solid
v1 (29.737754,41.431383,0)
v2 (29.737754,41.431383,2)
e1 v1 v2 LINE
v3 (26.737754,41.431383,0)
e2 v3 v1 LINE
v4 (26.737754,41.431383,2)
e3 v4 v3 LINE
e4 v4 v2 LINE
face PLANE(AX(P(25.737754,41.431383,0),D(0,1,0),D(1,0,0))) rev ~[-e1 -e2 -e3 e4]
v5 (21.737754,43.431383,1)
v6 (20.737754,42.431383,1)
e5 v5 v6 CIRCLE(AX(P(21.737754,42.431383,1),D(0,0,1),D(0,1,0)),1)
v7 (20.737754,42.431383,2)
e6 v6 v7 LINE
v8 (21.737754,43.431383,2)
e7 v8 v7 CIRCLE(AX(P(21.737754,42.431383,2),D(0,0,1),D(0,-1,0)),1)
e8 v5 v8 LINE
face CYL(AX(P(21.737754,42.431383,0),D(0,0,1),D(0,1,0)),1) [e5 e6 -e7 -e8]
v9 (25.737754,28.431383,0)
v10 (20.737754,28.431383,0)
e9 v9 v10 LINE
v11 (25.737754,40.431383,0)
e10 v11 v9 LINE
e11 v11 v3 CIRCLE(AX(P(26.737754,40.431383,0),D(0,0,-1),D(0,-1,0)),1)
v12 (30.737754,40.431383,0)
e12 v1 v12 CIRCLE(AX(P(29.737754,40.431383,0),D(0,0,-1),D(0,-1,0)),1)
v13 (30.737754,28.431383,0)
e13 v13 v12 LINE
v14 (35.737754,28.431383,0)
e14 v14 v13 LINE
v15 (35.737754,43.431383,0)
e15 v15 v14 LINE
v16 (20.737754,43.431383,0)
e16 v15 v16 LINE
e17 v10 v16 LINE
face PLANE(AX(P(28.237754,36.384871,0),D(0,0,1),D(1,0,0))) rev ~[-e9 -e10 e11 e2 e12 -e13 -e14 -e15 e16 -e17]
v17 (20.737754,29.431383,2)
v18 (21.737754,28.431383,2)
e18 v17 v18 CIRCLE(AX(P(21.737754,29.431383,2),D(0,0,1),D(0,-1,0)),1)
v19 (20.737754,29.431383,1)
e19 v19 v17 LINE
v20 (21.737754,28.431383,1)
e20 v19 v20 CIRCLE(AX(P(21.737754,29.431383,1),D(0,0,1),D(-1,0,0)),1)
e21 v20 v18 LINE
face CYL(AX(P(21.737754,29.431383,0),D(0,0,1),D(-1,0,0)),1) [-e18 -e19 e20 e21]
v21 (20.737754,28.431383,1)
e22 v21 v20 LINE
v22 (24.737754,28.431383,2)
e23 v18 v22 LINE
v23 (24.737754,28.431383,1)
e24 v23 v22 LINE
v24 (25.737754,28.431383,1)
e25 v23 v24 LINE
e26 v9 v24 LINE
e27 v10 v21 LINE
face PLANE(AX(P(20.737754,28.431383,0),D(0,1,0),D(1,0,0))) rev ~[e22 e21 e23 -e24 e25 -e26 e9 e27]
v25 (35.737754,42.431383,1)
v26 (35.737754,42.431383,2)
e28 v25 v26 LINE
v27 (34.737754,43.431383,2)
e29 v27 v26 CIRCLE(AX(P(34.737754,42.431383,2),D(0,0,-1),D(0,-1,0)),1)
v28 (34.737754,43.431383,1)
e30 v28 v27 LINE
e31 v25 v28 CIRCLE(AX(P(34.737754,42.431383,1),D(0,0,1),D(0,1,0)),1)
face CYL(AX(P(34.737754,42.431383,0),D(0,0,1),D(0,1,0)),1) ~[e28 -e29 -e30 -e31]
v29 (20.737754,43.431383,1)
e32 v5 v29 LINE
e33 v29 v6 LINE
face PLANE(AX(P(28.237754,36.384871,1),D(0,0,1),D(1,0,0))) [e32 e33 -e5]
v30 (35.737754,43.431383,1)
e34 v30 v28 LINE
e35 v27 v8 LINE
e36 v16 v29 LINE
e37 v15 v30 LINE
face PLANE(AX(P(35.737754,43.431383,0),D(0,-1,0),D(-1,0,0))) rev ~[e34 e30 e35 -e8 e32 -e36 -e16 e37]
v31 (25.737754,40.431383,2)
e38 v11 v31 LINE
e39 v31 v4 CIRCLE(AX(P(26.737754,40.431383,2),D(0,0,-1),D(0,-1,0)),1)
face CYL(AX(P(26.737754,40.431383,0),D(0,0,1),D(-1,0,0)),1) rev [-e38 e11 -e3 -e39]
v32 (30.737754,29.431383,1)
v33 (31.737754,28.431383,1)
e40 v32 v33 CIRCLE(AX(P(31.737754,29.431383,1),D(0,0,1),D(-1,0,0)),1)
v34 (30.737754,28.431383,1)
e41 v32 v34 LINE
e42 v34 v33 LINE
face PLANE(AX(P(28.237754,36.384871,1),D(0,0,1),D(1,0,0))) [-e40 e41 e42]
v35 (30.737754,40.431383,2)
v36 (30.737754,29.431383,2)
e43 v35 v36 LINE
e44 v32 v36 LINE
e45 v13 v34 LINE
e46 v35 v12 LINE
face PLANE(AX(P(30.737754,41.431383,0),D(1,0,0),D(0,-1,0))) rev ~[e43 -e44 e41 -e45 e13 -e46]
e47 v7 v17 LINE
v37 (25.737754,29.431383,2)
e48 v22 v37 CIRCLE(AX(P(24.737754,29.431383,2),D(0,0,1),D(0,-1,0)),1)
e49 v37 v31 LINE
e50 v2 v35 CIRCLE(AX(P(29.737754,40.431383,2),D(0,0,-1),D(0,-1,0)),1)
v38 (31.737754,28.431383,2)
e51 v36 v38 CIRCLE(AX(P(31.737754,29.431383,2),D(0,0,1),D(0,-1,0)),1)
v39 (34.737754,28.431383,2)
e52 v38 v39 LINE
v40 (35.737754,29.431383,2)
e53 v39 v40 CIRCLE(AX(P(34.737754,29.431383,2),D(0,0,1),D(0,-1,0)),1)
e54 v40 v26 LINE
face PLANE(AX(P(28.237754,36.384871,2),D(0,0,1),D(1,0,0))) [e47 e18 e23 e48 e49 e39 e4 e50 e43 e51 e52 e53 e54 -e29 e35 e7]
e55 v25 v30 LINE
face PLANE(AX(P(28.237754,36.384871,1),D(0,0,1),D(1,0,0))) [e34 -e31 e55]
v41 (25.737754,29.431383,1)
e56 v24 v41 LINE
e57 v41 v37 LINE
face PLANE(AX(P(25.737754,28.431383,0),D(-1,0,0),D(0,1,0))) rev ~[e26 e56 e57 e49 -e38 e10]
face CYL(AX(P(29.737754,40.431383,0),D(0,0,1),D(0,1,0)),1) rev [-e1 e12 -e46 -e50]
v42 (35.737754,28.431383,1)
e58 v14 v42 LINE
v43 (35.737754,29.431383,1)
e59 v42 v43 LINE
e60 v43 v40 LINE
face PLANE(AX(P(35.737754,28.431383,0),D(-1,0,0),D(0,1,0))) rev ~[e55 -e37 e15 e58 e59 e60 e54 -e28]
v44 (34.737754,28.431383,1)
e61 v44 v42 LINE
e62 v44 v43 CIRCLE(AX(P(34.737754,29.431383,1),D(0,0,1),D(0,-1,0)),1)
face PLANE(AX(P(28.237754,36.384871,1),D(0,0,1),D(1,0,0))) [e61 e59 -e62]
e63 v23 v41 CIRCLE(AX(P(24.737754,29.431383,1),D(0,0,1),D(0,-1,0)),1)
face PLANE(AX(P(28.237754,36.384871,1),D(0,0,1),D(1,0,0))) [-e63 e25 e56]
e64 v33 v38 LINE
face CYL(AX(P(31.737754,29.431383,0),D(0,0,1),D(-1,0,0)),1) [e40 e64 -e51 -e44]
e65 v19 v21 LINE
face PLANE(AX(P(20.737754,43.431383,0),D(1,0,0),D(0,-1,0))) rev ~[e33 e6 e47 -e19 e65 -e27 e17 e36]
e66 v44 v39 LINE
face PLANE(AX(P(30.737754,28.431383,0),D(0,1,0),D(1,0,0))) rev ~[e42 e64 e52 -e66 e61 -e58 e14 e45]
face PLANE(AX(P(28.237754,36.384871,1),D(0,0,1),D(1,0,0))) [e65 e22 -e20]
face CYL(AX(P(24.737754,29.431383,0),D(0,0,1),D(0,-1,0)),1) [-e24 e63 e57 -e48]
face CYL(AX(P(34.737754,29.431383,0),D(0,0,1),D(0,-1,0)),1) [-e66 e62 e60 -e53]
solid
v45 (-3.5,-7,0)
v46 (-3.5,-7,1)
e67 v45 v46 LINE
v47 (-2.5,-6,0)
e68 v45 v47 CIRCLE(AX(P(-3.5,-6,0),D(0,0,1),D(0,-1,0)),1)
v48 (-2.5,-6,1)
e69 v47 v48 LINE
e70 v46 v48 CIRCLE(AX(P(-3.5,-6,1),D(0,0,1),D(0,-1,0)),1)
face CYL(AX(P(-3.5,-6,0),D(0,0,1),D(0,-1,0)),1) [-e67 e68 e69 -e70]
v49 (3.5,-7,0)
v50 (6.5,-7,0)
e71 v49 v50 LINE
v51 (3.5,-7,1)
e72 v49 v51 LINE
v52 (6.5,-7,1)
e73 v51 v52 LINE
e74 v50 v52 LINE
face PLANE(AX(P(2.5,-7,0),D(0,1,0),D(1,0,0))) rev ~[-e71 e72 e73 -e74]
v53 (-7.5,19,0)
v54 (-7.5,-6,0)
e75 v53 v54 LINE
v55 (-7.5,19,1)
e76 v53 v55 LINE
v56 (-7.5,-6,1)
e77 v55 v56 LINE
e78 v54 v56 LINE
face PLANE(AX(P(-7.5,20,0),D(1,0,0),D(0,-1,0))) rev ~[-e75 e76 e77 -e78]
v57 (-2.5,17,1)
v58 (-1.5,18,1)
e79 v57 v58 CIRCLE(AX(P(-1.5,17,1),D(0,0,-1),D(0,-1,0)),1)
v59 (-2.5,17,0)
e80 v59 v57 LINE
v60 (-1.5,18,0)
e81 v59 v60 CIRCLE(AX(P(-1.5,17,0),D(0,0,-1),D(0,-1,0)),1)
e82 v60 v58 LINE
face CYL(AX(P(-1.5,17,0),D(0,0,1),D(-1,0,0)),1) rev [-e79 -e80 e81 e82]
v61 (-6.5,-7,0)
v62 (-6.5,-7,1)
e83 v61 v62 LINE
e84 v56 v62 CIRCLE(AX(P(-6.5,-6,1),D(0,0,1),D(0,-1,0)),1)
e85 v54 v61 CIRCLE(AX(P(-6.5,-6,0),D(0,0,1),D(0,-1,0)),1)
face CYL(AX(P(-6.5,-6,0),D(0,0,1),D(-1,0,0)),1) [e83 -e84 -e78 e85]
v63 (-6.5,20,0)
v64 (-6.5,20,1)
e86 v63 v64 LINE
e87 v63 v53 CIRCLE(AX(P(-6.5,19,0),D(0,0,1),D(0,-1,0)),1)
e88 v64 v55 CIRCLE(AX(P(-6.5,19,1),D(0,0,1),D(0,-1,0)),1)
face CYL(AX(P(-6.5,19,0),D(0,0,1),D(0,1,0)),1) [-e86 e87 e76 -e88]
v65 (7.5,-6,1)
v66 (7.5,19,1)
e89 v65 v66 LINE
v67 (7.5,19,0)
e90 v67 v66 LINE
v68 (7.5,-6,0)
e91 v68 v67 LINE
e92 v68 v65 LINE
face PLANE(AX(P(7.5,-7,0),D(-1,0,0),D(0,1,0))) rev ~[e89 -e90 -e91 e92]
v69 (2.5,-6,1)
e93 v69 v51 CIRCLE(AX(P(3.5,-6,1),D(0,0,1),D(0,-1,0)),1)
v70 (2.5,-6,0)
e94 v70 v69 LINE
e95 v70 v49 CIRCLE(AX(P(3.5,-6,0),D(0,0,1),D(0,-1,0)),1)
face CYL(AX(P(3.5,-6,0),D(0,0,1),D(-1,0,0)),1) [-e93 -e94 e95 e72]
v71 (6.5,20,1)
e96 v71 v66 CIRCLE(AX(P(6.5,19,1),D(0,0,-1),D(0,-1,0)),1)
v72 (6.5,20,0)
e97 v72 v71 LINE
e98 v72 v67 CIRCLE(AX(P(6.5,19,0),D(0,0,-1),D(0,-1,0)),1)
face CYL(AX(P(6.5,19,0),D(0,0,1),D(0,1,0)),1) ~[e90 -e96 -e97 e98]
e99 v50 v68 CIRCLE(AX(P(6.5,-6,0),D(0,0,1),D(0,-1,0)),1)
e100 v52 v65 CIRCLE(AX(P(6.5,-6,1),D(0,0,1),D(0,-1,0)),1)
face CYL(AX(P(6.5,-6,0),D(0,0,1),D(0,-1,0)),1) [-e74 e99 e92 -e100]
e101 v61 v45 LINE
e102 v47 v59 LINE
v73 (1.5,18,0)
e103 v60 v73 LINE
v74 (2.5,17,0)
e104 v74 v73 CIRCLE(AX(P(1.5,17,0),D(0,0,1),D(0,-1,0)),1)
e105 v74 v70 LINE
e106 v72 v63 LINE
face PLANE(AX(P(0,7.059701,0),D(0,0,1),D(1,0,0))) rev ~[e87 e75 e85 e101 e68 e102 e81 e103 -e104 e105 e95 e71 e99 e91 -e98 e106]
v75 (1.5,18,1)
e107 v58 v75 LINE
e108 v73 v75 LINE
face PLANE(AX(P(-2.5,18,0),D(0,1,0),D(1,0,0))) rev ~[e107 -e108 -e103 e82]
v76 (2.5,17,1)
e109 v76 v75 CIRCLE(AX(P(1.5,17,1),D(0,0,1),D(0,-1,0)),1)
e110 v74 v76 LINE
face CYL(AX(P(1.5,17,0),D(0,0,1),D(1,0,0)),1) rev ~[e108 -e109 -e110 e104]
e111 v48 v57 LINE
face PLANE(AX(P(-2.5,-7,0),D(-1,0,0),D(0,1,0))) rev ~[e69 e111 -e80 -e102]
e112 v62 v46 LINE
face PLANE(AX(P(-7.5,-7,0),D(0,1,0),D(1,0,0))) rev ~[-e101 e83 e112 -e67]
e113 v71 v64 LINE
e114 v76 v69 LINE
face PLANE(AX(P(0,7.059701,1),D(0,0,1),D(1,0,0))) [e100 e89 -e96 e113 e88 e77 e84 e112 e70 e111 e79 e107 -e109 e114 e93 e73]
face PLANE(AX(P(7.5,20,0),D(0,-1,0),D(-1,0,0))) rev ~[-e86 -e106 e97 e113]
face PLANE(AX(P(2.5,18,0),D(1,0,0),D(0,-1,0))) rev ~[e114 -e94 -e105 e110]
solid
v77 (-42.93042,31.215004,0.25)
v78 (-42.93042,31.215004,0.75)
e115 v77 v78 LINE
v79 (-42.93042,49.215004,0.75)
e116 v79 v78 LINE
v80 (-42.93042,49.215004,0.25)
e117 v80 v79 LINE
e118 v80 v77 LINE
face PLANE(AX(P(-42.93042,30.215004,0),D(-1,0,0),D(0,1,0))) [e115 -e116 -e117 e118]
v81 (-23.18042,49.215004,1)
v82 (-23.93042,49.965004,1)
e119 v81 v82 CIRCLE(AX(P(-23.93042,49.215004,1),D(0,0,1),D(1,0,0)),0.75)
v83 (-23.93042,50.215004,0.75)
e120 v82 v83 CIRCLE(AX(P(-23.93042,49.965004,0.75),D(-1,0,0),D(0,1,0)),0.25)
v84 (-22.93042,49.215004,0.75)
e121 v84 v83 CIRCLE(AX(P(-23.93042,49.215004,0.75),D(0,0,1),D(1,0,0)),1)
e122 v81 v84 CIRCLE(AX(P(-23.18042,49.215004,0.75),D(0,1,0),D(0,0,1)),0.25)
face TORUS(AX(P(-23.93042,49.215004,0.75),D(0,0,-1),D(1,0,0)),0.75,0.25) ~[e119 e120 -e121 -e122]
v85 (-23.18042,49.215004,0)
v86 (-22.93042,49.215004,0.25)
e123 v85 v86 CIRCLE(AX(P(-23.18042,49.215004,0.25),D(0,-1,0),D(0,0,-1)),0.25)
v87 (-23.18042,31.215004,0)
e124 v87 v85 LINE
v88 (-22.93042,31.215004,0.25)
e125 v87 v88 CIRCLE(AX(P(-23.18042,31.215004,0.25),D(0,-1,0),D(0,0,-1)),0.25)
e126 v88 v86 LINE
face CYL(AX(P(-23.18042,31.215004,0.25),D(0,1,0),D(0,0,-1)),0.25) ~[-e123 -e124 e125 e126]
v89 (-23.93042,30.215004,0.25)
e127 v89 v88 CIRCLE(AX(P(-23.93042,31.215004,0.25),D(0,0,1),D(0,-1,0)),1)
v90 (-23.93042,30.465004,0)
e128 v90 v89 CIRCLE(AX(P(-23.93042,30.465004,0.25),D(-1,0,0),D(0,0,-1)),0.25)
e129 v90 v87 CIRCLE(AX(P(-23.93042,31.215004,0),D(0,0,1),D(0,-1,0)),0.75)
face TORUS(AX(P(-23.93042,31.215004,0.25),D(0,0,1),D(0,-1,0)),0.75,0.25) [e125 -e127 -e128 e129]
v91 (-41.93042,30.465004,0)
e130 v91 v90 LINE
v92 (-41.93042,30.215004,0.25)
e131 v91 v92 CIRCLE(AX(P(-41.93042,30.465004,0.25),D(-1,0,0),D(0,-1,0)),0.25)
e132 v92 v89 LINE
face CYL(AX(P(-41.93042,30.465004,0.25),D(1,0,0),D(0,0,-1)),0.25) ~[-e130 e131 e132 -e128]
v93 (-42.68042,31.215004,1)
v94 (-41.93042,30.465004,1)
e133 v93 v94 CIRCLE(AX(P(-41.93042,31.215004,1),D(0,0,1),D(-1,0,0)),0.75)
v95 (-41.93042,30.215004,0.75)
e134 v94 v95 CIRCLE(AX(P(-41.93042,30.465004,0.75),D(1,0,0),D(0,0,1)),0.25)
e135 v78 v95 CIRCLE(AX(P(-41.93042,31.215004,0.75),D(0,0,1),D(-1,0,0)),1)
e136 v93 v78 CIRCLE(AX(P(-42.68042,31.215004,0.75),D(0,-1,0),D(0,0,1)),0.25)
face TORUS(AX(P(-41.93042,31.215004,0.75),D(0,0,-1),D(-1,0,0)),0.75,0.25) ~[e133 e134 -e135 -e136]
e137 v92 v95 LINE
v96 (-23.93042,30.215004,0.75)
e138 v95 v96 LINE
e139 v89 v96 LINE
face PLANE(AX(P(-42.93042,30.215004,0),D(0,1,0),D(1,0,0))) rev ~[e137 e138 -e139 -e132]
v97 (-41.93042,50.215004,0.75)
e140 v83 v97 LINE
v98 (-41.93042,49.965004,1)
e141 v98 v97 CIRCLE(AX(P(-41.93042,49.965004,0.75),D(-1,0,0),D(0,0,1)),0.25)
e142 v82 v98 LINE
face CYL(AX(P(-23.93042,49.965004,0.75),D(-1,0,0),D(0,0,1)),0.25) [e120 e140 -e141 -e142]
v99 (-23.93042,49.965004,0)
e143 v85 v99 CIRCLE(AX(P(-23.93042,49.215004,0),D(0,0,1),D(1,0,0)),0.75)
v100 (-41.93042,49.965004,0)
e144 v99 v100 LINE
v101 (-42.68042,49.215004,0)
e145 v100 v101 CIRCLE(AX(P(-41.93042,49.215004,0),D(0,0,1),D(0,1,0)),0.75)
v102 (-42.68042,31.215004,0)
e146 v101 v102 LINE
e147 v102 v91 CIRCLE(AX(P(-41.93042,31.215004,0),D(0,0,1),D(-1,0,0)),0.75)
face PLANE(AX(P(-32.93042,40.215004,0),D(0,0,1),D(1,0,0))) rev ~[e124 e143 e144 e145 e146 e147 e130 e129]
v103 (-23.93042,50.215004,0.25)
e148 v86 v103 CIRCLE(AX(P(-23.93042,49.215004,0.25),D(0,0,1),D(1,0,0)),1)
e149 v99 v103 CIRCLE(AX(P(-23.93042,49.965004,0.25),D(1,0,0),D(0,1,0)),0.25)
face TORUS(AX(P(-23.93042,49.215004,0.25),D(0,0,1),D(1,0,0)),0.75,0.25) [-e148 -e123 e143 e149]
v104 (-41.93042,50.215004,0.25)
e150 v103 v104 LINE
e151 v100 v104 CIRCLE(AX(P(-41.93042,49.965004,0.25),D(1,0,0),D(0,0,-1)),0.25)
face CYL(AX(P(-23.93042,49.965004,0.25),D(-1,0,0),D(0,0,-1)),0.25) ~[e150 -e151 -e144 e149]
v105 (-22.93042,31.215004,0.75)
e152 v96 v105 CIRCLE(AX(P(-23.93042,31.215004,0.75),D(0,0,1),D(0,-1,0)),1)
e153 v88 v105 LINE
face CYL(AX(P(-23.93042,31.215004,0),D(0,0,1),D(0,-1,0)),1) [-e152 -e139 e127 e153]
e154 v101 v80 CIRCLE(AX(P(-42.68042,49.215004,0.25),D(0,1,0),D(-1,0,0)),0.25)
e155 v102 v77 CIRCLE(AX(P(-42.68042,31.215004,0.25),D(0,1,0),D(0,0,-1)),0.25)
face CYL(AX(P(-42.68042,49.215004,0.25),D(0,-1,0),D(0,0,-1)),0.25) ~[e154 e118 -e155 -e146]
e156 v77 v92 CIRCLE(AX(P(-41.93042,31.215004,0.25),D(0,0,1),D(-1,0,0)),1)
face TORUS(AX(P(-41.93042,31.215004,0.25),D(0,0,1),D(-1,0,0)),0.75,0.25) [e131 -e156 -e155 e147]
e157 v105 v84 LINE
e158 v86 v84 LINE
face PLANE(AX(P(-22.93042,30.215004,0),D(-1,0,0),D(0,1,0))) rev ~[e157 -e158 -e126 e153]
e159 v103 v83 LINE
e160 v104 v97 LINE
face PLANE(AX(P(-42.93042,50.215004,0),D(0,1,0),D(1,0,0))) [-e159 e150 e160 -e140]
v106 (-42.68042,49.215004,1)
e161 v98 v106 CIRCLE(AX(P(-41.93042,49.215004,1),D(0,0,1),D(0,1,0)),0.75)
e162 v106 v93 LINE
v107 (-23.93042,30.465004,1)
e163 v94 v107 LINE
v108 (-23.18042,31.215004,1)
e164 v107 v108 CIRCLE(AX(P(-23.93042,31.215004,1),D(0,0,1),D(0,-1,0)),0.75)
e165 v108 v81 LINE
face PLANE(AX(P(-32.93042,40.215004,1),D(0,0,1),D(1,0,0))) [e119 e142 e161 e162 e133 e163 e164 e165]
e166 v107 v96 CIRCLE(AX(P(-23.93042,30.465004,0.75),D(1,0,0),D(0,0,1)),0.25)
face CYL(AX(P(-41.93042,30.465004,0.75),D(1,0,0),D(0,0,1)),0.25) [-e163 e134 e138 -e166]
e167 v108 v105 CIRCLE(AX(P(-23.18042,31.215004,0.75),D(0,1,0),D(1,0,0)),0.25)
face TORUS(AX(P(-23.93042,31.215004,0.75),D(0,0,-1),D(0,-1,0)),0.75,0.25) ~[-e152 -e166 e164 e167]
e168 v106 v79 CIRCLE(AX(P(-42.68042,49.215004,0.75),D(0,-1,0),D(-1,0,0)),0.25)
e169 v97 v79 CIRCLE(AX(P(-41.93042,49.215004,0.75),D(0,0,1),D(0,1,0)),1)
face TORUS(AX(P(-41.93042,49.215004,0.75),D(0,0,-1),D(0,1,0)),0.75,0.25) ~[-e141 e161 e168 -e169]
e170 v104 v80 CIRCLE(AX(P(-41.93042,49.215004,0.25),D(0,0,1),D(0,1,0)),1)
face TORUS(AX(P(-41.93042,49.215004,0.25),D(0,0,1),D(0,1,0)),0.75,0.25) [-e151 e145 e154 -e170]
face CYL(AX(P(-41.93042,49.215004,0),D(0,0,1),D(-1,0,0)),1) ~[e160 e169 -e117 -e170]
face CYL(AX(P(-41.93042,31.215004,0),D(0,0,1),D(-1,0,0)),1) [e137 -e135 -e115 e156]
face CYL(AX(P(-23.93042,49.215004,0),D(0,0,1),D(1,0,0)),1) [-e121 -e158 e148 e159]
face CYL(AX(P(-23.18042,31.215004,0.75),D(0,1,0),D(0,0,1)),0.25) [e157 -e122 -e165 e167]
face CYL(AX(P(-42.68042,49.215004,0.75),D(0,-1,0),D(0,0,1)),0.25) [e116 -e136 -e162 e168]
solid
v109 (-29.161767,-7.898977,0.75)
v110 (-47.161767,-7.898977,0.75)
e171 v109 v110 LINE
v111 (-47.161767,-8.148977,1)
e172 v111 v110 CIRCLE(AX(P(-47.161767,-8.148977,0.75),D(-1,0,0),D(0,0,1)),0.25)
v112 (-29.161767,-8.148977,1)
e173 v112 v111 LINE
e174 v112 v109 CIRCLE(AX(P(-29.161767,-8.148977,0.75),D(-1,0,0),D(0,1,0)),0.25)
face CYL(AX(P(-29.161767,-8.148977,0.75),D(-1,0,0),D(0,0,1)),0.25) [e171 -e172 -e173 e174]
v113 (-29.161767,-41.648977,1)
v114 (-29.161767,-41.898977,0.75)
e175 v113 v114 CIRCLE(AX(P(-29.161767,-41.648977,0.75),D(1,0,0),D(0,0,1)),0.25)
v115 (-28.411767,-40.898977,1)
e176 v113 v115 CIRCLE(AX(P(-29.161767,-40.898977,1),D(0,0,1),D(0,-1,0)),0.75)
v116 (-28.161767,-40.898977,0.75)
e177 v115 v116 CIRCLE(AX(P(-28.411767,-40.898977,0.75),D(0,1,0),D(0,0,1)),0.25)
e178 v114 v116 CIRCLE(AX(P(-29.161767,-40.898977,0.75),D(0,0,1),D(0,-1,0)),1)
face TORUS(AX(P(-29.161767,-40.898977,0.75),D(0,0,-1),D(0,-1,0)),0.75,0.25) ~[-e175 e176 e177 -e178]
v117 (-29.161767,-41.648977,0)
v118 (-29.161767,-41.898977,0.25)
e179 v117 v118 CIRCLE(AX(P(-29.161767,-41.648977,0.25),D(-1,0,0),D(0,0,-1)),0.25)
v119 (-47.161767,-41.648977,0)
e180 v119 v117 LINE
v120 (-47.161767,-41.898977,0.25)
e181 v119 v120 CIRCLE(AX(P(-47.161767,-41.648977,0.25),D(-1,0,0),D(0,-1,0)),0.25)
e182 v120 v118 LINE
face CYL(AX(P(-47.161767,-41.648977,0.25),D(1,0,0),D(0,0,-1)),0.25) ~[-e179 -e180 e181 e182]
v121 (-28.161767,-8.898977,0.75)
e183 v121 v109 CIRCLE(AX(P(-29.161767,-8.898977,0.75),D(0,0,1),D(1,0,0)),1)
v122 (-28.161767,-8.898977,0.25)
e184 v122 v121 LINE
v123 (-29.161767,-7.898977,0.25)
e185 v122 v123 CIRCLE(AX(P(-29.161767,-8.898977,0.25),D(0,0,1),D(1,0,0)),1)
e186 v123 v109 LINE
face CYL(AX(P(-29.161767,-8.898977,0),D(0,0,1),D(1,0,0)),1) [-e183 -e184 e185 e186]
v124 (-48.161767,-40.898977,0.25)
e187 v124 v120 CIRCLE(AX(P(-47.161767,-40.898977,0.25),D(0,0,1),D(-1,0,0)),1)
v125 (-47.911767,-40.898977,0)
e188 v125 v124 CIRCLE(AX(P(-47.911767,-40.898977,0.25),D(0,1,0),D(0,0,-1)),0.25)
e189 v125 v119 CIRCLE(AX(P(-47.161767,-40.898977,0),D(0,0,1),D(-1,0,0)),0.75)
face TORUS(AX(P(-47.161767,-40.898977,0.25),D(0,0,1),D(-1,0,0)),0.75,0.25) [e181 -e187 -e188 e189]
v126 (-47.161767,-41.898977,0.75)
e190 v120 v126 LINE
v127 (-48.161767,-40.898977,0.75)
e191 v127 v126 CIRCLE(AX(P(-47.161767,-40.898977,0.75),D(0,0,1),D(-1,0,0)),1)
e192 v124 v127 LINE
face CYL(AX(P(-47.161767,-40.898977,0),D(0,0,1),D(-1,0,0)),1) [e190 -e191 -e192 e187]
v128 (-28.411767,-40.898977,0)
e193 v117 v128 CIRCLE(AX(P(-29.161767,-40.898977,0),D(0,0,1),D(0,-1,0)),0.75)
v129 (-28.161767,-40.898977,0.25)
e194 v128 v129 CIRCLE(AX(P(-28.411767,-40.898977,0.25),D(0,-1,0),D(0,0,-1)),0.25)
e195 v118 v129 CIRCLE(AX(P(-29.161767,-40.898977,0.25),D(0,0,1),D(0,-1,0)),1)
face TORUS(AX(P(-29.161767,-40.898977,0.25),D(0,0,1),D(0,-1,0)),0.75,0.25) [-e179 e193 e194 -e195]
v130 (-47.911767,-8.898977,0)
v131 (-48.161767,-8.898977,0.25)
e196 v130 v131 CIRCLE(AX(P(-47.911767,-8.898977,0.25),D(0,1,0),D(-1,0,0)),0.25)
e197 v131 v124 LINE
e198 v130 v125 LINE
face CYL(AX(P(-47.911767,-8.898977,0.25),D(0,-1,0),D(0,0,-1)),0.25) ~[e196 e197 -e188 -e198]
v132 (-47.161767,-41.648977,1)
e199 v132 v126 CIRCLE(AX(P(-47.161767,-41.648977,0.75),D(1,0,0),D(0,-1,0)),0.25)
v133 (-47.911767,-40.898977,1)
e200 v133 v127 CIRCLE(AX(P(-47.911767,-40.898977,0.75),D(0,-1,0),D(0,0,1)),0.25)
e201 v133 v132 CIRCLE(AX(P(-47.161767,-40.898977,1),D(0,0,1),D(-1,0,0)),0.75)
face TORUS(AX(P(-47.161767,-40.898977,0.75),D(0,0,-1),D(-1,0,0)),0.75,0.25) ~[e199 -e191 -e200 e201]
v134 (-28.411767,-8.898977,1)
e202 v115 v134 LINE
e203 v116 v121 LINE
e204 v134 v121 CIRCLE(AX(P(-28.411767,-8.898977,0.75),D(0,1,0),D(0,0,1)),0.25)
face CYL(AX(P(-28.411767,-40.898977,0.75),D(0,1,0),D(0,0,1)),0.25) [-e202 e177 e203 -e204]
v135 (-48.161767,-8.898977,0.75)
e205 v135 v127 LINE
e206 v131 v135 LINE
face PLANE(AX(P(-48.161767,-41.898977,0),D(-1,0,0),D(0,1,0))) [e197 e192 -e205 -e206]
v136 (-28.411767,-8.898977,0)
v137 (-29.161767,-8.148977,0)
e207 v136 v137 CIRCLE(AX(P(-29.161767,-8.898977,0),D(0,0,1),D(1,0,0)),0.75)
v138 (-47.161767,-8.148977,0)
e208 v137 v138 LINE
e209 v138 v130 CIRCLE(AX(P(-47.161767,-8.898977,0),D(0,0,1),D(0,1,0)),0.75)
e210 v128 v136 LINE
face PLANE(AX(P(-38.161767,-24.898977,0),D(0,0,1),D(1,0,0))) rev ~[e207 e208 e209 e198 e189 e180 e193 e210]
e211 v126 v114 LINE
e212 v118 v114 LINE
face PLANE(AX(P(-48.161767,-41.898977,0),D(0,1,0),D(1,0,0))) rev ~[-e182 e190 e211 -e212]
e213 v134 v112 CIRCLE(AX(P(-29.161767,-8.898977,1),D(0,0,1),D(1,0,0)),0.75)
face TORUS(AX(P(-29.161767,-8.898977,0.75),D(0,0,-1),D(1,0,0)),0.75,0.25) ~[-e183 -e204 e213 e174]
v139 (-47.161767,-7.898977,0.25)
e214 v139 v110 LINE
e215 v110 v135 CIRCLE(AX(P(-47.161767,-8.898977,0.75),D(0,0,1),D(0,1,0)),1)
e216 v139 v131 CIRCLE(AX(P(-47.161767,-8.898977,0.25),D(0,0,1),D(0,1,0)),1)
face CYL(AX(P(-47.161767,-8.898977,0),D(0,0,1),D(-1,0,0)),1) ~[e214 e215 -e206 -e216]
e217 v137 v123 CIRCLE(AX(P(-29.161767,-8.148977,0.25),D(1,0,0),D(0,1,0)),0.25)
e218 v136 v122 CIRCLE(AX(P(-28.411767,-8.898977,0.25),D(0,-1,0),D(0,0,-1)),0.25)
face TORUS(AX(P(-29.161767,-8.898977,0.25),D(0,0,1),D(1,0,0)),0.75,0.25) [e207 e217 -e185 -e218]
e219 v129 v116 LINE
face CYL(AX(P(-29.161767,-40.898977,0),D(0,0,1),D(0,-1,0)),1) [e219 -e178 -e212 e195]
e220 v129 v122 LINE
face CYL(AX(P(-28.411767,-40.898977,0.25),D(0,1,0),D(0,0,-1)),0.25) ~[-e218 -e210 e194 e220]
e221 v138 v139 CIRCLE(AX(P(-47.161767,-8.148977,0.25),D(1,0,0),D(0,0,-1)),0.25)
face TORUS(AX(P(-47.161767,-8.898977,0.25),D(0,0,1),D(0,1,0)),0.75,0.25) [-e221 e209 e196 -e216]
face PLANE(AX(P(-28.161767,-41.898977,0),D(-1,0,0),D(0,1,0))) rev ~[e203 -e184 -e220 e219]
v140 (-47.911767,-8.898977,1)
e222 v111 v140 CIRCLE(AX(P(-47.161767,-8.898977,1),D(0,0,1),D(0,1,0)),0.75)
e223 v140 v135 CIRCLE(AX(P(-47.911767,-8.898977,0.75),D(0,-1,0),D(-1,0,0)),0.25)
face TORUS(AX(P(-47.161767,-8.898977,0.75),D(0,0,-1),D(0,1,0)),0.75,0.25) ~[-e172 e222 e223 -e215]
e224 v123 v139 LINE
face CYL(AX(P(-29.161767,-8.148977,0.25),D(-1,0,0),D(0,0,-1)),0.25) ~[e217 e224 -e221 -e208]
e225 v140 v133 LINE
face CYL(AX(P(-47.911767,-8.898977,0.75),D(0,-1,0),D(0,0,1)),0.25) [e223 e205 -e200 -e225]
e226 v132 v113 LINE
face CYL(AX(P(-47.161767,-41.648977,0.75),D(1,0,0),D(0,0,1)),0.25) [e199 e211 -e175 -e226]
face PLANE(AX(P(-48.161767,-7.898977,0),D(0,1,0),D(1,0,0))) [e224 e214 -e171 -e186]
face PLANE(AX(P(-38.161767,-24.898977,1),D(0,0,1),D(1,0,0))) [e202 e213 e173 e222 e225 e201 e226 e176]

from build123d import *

# Parameters (mm, degrees)
F0_W      = 20
F0_H      = 20
F1_DEPTH  = 1
F2_R      = 1
F3_R      = 0.25
F5_DEPTH  = 2
F6_R      = 1
F8_DEPTH  = 1
F9_R      = 1
F10_W     = 20
F10_H     = 34
F11_DEPTH = 1
F12_R     = 1
F13_R     = 0.25
F14_R     = 1


# Not quite as in the source:
# - two fillets or chamfers of one size are made in one step


with BuildPart() as f1:
    # F0 (on Top) → F1 (new body)
    with BuildSketch(Plane.XY):
        with Locations((-32.9304196417, 40.2150040078)):
            Rectangle(F0_W, F0_H)
    extrude(amount=F1_DEPTH)

    # F2
    f2_edges = [f1.edges().sort_by_distance(p)[0] for p in [
        (-42.93042, 50.215004, 0.5),
        (-22.93042, 50.215004, 0.5),
        (-22.93042, 30.215004, 0.5),
        (-42.93042, 30.215004, 0.5),
    ]]
    fillet(f2_edges, radius=F2_R)

    # F3
    f3_edges = [f1.edges().sort_by_distance(p)[0] for p in [
        (-32.93042, 30.215004, 1),
        (-22.93042, 40.215004, 0),
        (-22.93042, 31.215004, 0.5),
        (-22.93042, 49.215004, 0.5),
        (-22.93042, 40.215004, 1),
    ]]
    fillet(f3_edges, radius=F3_R)


with BuildPart() as f5:
    # F4 (on Top) → F5 (new body)
    with BuildSketch(Plane.XY):
        Polygon((35.7377539144, 43.4313830447), (20.7377539144, 43.4313830447), (20.7377539144, 28.4313830447), (25.7377539144, 28.4313830447), (25.7377539144, 41.4313830447), (30.7377539144, 41.4313830447), (30.7377539144, 28.4313830447), (35.7377539144, 28.4313830447), align=None)
    extrude(amount=F5_DEPTH)

    # F6
    f6_edges = [f5.edges().sort_by_distance(p)[0] for p in [
        (35.737754, 43.431383, 1),
        (20.737754, 43.431383, 1),
        (35.737754, 28.431383, 1),
        (30.737754, 28.431383, 1),
        (25.737754, 28.431383, 1),
        (20.737754, 28.431383, 1),
        (25.737754, 41.431383, 1),
        (30.737754, 41.431383, 1),
    ]]
    fillet(f6_edges, radius=F6_R)

    # F4 (on Top) → F8 (join)
    with BuildSketch(Plane.XY):
        Polygon((35.7377539144, 43.4313830447), (20.7377539144, 43.4313830447), (20.7377539144, 28.4313830447), (25.7377539144, 28.4313830447), (25.7377539144, 41.4313830447), (30.7377539144, 41.4313830447), (30.7377539144, 28.4313830447), (35.7377539144, 28.4313830447), align=None)
    extrude(amount=F8_DEPTH)


with BuildPart() as f8:
    # F4 (on Top) → F8, piece 2 (new body)
    with BuildSketch(Plane.XY):
        Polygon((7.5, 20), (-7.5, 20), (-7.5, -7), (-2.5, -7), (-2.5, 18), (2.5, 18), (2.5, -7), (7.5, -7), align=None)
    extrude(amount=F8_DEPTH)

    # F9
    f9_edges = [f8.edges().sort_by_distance(p)[0] for p in [
        (-7.5, -7, 0.5),
        (2.5, -7, 0.5),
        (-2.5, -7, 0.5),
        (7.5, -7, 0.5),
        (7.5, 20, 0.5),
        (-7.5, 20, 0.5),
    ]]
    fillet(f9_edges, radius=F9_R)

    # F14
    f14_edges = [f8.edges().sort_by_distance(p)[0] for p in [
        (-2.5, 18, 0.5),
        (2.5, 18, 0.5),
    ]]
    fillet(f14_edges, radius=F14_R)


with BuildPart() as f11:
    # F10 (on Top) → F11 (new body)
    with BuildSketch(Plane.XY):
        with Locations((-38.1617667153, -24.8989770475)):
            Rectangle(F10_W, F10_H)
    extrude(amount=F11_DEPTH)

    # F12
    f12_edges = [f11.edges().sort_by_distance(p)[0] for p in [
        (-28.161767, -41.898977, 0.5),
        (-28.161767, -7.898977, 0.5),
        (-48.161767, -41.898977, 0.5),
        (-48.161767, -7.898977, 0.5),
    ]]
    fillet(f12_edges, radius=F12_R)

    # F13
    f13_edges = [f11.edges().sort_by_distance(p)[0] for p in [
        (-28.161767, -24.898977, 1),
        (-28.45466, -41.606084, 1),
        (-28.45466, -8.19187, 1),
        (-38.161767, -41.898977, 1),
        (-38.161767, -7.898977, 1),
        (-47.868873, -41.606084, 1),
        (-47.868873, -8.19187, 1),
        (-48.161767, -24.898977, 1),
        (-28.161767, -24.898977, 0),
        (-28.45466, -41.606084, 0),
        (-28.45466, -8.19187, 0),
        (-38.161767, -41.898977, 0),
        (-38.161767, -7.898977, 0),
        (-47.868873, -41.606084, 0),
        (-47.868873, -8.19187, 0),
        (-48.161767, -24.898977, 0),
    ]]
    fillet(f13_edges, radius=F13_R)


solid = Compound([f1.part, f5.part, f8.part, f11.part])
